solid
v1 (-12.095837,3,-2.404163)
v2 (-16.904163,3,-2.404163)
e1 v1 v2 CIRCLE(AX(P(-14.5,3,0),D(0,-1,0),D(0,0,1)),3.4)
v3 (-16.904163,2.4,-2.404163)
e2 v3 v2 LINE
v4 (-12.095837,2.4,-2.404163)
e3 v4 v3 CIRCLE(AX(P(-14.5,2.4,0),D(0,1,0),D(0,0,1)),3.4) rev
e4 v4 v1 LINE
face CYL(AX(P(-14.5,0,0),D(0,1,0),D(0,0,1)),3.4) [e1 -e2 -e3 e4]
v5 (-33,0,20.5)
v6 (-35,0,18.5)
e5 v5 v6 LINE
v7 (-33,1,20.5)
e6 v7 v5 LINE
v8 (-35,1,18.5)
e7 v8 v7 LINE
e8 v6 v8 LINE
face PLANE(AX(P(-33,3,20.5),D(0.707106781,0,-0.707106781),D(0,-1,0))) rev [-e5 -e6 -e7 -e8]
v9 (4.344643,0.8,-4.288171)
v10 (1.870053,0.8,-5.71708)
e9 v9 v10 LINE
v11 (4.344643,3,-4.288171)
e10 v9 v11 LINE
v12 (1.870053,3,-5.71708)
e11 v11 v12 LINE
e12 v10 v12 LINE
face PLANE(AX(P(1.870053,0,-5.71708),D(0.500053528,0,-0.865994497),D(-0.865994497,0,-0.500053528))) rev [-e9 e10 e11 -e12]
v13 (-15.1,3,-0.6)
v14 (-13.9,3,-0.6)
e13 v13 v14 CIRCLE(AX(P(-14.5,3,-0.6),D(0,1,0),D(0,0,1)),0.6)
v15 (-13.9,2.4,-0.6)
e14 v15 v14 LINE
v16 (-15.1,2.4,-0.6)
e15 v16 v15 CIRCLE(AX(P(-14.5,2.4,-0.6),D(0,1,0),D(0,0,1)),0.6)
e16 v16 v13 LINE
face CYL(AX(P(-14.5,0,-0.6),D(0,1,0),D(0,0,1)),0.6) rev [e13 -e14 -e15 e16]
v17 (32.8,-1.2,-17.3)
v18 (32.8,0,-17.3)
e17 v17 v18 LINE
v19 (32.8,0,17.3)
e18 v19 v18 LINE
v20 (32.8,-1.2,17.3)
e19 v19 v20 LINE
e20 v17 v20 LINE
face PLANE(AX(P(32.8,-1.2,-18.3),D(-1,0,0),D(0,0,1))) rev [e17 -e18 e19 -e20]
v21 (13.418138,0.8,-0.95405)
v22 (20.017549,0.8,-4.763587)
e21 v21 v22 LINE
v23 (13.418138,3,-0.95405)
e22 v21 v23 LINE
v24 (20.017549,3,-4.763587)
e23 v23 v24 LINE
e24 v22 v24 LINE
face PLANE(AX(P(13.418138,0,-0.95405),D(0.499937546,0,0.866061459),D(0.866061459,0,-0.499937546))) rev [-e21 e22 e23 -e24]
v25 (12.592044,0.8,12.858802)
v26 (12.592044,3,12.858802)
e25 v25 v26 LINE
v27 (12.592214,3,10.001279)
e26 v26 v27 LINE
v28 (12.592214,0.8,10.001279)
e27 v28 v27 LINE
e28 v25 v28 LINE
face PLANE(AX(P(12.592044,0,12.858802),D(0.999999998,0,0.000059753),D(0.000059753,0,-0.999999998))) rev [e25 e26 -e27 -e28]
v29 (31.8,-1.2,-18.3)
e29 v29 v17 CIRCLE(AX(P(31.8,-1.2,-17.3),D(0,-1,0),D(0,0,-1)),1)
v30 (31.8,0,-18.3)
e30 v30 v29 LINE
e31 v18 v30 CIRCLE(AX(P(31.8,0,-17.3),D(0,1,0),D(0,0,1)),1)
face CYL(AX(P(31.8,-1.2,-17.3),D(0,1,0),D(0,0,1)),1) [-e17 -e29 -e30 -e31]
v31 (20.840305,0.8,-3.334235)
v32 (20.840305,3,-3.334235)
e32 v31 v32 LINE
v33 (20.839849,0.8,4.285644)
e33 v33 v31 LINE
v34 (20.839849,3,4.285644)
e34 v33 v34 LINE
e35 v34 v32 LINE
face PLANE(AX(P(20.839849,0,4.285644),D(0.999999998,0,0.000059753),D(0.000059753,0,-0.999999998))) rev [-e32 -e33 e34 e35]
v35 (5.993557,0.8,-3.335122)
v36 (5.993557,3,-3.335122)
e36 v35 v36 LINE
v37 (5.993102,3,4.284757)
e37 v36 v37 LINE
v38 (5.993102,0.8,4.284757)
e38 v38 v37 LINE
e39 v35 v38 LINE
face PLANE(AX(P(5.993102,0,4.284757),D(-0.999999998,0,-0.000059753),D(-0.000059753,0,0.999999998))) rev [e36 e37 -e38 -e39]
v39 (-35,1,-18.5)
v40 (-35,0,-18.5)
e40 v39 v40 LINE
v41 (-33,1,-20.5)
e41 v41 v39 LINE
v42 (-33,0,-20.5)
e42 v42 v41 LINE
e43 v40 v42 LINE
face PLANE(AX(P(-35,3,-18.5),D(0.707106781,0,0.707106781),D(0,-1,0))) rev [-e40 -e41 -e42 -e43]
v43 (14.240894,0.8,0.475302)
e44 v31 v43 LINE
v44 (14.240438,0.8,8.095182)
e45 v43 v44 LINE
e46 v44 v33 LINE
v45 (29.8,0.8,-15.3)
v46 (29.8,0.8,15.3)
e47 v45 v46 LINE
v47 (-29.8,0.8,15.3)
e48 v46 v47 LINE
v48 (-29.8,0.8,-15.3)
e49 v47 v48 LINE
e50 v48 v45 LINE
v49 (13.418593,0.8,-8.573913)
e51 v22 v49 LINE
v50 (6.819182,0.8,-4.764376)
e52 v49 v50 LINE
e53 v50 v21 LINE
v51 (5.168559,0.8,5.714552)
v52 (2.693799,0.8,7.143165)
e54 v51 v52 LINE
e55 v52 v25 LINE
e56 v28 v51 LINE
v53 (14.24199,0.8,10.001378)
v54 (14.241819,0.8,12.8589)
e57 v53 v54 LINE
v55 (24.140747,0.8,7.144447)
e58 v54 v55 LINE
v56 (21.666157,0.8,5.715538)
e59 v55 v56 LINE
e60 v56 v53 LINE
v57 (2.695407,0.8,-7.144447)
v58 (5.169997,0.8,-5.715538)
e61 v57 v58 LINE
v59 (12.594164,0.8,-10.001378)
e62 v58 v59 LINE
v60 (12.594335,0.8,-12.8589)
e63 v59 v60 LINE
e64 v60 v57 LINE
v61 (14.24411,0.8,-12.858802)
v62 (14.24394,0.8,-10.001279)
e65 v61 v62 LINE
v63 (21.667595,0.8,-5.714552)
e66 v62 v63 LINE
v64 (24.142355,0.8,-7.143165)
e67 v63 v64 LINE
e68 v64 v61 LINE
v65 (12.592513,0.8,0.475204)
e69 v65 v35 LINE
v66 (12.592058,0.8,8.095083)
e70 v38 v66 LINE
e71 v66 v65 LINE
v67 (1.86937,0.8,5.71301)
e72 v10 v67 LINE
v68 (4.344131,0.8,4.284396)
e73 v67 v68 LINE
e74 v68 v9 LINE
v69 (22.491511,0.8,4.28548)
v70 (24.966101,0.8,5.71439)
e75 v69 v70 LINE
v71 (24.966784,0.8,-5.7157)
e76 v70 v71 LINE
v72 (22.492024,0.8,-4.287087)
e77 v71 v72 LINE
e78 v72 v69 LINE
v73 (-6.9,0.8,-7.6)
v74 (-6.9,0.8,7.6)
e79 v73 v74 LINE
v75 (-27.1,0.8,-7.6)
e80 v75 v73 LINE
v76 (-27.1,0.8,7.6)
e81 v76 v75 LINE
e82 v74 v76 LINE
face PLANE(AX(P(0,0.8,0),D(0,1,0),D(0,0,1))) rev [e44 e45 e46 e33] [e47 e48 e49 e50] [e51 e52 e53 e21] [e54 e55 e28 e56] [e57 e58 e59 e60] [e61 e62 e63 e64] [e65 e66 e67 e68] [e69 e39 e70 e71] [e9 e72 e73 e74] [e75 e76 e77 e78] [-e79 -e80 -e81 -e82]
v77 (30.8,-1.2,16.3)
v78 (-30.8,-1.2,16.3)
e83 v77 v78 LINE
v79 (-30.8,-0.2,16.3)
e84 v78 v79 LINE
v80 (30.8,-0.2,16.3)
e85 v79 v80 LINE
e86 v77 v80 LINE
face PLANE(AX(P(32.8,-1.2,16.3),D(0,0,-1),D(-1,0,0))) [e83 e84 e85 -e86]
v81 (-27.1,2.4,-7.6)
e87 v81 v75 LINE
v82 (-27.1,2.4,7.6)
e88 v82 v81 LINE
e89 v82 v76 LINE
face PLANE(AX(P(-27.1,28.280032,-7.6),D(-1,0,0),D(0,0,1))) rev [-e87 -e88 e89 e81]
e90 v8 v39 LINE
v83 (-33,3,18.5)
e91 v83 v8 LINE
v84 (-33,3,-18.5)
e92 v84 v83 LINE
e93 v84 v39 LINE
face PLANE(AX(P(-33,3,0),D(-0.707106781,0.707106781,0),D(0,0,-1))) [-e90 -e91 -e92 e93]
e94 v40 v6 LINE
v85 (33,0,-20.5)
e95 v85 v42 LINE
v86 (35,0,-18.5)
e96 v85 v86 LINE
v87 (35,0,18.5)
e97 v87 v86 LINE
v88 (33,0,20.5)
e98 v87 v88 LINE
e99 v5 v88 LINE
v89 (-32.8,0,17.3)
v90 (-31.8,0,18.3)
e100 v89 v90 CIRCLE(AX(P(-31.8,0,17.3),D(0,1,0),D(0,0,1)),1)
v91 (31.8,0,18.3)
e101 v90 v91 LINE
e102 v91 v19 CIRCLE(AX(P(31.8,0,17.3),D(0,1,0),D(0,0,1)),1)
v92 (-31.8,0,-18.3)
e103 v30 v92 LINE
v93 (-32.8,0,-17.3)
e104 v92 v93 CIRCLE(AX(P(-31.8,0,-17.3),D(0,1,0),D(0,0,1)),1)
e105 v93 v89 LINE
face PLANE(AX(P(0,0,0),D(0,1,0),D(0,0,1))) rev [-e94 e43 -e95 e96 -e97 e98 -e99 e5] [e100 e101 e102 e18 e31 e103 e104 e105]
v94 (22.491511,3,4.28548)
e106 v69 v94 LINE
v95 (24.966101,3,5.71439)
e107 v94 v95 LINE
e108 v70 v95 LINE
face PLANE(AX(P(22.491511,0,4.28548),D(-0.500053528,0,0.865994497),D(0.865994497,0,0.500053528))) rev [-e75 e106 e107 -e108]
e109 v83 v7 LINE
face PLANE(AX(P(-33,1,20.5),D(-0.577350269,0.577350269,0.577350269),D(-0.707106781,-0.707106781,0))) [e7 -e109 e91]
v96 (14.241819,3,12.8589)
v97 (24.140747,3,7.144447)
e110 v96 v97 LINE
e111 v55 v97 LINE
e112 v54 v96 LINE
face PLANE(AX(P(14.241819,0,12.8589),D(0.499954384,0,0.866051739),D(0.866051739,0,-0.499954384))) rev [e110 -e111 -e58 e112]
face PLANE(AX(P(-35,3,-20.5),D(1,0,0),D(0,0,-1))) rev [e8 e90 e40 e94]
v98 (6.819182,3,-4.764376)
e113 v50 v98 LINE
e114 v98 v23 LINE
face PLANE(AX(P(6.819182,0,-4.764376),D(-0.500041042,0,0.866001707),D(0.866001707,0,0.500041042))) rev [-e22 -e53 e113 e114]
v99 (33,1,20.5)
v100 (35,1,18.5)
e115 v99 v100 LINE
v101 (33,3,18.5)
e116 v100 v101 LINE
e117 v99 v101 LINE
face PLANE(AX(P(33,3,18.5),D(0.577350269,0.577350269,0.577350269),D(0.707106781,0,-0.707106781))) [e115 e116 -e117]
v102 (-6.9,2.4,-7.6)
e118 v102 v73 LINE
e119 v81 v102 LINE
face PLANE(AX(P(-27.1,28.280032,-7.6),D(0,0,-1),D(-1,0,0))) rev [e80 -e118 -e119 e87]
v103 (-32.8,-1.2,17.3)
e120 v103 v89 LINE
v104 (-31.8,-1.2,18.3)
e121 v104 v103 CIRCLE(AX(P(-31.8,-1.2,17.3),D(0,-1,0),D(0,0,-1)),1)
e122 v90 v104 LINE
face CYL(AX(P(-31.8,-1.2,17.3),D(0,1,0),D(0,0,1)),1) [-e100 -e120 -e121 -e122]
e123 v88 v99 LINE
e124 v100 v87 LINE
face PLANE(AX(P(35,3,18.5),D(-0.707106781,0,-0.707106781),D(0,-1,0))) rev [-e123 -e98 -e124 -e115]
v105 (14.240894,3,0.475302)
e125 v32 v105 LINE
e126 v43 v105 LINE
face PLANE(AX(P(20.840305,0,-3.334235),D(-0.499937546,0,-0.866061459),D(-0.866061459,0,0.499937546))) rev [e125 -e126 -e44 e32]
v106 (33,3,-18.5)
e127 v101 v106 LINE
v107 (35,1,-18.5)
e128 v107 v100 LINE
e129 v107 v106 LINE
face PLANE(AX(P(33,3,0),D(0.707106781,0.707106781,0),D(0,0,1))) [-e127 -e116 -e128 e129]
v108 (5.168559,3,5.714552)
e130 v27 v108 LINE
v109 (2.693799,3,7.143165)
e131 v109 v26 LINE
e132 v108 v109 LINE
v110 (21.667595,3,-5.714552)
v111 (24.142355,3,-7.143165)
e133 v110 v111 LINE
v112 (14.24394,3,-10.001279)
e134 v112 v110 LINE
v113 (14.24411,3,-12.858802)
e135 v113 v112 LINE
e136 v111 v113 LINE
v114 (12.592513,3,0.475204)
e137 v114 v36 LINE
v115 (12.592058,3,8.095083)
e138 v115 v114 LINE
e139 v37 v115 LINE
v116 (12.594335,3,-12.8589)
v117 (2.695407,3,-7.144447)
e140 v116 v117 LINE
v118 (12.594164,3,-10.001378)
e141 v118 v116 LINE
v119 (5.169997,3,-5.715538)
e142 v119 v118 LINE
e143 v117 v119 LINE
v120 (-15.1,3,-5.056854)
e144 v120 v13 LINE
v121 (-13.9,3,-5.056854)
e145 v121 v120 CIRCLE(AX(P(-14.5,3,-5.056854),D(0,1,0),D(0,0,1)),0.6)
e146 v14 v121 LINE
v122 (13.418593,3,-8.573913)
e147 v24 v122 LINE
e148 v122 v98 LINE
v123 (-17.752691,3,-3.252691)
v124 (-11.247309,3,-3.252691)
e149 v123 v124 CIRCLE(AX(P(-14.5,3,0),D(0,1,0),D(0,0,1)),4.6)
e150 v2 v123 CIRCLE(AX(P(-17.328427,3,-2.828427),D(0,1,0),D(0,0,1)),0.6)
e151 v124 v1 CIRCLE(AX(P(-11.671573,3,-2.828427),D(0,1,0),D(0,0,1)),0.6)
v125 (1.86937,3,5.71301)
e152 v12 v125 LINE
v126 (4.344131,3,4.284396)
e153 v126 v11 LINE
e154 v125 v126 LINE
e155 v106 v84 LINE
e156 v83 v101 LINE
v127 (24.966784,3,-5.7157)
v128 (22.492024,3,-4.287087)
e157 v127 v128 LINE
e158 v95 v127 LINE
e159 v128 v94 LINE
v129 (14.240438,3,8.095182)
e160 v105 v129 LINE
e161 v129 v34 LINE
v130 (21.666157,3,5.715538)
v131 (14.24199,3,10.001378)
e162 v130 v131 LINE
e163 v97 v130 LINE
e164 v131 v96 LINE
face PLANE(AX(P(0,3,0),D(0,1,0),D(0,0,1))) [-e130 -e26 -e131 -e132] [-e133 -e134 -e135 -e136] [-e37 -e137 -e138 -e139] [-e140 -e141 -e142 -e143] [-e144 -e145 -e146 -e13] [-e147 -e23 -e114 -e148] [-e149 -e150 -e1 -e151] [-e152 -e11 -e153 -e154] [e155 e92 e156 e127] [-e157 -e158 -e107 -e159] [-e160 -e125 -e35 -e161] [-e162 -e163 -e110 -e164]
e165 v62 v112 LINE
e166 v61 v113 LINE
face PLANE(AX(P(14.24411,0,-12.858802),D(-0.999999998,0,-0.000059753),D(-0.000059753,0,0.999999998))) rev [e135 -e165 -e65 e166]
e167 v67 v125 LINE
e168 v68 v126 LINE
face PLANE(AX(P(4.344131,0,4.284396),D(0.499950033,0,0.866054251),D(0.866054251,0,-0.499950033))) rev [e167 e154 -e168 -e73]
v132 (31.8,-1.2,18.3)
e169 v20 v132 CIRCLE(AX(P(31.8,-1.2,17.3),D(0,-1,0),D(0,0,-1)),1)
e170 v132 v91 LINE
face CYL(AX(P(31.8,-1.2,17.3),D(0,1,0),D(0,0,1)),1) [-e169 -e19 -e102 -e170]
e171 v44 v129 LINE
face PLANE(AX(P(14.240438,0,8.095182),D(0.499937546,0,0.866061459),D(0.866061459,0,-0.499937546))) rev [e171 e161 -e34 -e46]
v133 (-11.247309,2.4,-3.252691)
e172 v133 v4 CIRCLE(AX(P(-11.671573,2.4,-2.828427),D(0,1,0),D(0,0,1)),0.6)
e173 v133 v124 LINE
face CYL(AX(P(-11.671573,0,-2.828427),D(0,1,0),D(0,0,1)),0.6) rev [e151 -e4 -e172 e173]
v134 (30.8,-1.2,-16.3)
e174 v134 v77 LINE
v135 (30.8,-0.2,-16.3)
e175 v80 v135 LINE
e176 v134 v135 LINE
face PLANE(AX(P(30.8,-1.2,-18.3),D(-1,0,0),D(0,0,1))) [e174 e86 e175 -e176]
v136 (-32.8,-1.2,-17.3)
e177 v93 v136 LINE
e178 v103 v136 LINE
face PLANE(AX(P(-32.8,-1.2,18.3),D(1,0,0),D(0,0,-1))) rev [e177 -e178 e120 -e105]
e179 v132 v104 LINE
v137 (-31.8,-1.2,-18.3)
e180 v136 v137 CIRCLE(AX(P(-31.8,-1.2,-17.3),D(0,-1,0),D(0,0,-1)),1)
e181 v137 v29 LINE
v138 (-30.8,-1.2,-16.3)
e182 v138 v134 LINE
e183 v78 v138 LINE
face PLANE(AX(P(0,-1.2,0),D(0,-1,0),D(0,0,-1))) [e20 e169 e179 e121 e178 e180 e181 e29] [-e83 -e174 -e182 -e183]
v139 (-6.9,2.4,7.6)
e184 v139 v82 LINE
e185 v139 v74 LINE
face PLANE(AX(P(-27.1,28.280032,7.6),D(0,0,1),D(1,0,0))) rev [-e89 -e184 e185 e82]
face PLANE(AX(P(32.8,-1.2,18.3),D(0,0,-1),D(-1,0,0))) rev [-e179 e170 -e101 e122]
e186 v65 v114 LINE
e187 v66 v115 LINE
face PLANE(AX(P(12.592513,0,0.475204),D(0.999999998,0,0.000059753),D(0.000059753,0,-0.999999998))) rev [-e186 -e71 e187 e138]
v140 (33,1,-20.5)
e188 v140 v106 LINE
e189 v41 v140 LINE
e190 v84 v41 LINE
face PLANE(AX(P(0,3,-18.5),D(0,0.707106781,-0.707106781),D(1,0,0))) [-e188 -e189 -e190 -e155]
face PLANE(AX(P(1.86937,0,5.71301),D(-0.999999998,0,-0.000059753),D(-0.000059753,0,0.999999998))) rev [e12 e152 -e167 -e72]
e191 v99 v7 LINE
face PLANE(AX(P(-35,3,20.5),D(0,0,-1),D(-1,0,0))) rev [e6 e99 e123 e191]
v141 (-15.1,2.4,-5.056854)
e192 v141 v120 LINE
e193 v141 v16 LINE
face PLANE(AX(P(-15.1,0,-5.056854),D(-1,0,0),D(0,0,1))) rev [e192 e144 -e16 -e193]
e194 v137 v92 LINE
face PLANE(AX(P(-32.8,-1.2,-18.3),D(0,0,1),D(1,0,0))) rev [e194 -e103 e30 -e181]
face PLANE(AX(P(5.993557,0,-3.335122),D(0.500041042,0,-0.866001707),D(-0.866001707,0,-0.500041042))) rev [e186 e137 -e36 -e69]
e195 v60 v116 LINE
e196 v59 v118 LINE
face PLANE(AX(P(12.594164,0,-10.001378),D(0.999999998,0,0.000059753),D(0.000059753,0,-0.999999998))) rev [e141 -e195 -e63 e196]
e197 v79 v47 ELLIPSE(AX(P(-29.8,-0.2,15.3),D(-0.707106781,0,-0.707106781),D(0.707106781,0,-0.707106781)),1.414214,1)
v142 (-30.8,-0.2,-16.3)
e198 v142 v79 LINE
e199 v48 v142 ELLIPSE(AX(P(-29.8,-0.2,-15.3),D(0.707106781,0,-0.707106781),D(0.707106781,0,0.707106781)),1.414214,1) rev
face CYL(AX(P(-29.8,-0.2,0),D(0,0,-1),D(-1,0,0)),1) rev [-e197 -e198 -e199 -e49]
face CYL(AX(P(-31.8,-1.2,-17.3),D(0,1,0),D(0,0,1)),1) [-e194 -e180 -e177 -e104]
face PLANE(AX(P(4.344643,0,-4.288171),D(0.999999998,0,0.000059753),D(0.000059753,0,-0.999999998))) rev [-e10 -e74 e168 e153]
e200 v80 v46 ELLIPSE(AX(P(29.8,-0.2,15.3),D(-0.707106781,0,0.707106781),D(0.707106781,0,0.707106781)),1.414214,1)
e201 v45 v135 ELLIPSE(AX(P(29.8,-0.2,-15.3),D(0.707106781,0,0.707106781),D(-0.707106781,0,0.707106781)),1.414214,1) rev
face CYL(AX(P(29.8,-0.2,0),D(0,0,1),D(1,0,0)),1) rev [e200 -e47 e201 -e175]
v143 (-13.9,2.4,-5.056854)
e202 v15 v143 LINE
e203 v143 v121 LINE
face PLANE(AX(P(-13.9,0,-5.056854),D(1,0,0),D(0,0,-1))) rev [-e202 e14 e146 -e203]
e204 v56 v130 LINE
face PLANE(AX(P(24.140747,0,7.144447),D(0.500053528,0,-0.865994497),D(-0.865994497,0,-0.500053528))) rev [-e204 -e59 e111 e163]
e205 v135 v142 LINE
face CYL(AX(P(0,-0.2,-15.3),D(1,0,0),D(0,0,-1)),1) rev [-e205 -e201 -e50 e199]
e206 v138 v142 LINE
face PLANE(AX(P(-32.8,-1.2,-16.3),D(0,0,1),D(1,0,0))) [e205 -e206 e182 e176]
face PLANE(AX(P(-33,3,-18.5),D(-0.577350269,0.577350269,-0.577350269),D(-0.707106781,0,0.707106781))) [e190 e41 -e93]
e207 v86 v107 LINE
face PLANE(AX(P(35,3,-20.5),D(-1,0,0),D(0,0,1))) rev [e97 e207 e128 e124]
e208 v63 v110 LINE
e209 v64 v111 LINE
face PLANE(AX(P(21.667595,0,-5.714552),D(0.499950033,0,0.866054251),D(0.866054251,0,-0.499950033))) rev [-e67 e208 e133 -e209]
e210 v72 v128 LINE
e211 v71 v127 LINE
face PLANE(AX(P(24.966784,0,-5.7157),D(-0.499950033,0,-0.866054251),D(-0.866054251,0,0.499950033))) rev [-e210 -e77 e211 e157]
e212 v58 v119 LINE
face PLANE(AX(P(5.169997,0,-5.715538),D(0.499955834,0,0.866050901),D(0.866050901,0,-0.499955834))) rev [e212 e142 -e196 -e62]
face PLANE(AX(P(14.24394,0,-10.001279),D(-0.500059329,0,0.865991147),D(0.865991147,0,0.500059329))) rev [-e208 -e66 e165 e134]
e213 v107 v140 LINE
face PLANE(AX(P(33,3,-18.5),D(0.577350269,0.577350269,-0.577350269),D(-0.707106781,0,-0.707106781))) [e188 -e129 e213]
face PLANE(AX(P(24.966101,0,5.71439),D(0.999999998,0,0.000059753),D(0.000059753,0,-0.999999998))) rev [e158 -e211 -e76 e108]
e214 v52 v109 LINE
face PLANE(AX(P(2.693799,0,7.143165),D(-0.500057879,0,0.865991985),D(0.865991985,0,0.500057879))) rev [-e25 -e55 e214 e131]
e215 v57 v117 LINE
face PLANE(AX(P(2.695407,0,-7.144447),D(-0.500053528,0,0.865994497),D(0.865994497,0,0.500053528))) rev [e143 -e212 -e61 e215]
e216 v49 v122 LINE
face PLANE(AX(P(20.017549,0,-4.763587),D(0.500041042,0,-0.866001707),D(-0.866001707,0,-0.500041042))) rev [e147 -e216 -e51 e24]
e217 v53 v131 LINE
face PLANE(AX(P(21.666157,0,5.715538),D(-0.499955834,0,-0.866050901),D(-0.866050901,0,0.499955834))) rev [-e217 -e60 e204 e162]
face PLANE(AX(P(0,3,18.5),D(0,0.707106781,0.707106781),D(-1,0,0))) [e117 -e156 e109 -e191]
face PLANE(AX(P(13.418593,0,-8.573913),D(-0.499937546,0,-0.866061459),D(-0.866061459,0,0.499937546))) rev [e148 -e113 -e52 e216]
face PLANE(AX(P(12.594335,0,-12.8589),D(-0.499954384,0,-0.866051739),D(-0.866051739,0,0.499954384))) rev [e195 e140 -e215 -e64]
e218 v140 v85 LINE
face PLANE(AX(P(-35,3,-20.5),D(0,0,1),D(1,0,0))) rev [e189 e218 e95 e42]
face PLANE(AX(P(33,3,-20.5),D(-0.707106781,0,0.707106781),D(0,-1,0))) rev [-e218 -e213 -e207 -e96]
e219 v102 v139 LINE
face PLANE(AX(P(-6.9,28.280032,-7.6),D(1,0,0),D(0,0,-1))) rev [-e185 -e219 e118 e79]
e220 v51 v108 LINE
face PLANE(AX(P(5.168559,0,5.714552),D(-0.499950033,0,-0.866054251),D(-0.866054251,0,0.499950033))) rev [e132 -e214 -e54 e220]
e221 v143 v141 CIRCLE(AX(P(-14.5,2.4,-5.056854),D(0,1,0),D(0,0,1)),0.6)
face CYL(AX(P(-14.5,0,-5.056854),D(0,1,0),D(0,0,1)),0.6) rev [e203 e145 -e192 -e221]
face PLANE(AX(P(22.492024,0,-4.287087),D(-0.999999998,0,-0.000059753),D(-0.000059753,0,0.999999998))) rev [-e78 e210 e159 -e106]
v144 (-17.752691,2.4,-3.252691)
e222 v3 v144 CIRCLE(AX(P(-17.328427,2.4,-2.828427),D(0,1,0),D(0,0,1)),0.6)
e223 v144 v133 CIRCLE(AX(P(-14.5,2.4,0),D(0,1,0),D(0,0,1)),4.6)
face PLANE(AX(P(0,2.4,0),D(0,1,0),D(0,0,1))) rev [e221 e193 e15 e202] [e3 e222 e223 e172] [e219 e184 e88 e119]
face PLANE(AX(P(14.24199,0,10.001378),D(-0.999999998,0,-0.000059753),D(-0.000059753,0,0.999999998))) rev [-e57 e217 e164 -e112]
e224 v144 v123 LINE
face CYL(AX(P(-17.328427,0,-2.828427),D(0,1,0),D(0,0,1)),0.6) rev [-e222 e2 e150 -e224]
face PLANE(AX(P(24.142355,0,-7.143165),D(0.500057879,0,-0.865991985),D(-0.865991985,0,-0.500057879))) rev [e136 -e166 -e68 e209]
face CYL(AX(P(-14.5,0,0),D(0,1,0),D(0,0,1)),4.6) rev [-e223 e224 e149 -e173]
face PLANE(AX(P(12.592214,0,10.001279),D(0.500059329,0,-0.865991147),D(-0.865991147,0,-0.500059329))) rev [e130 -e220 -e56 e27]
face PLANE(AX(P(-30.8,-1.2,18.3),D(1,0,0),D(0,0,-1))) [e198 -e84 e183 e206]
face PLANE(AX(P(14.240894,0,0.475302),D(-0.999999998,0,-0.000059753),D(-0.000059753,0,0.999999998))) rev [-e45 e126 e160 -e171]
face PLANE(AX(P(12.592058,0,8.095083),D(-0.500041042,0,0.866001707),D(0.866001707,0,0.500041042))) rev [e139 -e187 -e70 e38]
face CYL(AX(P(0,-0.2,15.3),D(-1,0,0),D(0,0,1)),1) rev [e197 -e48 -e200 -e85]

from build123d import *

# Parameters (mm, degrees)
ESQUISSE1_W             = 70
ESQUISSE1_H             = 41
BOSS_EXTRU_1_DEPTH      = 3
COQUE1_T                = -2.2
CHANFREIN1_SIZE         = 2
ESQUISSE3_W             = 20.2
ESQUISSE3_H             = 15.2
ENL_V_MAT_EXTRU_2_DEPTH = 1.6
ENL_V_MAT_EXTRU_5_DEPTH = 41.672472263
ENL_V_START             = -2.2
ENL_V_MAT_EXTRU_4_DEPTH = 2.2
ESQUISSE7_W             = 65.6
ESQUISSE7_H             = 36.6
ESQUISSE7_W_2           = 61.6
ESQUISSE7_H_2           = 32.6
EXTRU_MINCE1_DEPTH      = 2
CONG_1_R                = 1


# Read off the part's stored shape, not the designer's step: Enlèv. mat.-Extru.4
with BuildPart() as part:
    # Esquisse1 → Boss.-Extru.1 (new body)
    with BuildSketch(Plane(origin=(0, 0, 0), x_dir=(1, 0, 0), z_dir=(0, 1, 0))):
        Rectangle(ESQUISSE1_W, ESQUISSE1_H)
    extrude(amount=BOSS_EXTRU_1_DEPTH)

    # Coque1
    coque1_openings = [part.faces().sort_by_distance(p)[0] for p in [
        (0, 0, 0),
    ]]
    offset(amount=COQUE1_T, openings=coque1_openings, kind=Kind.INTERSECTION)

    # Chanfrein1
    chanfrein1_edges = [part.edges().sort_by_distance(p)[0] for p in [
        (-35, 3, 0),
        (0, 3, 20.5),
        (35, 3, 0),
        (35, 1.5, 20.5),
        (-35, 1.5, 20.5),
        (-35, 1.5, -20.5),
        (35, 1.5, -20.5),
        (0, 3, -20.5),
    ]]
    chamfer(chanfrein1_edges, length=CHANFREIN1_SIZE)

    # Esquisse3 → Enlèv. mat.-Extru.2 (cut)
    with BuildSketch(Plane.XZ.offset(-0.8)):
        with Locations((-17, 0)):
            Rectangle(ESQUISSE3_W, ESQUISSE3_H)
    extrude(amount=-ENL_V_MAT_EXTRU_2_DEPTH, mode=Mode.SUBTRACT)

    # Esquisse8 → Enlèv. mat.-Extru.5 (cut, through all)
    with BuildSketch(Plane(origin=(0, 3, 0), x_dir=(1, 0, 0), z_dir=(0, 1, 0))):
        with BuildLine():
            Line((-13.9, 5.056854249), (-13.9, 0.6))
            ThreePointArc((-13.9, 0.6), (-14.5, 0), (-15.1, 0.6))
            Line((-15.1, 0.6), (-15.1, 5.056854249))
            ThreePointArc((-15.1, 5.056854249), (-14.5, 5.656854249), (-13.9, 5.056854249))
        make_face()
        with BuildLine():
            ThreePointArc((-17.752691193, 3.252691193), (-14.5, -4.6), (-11.247308807, 3.252691193))
            ThreePointArc((-11.247308807, 3.252691193), (-12.095836944, 3.252691193), (-12.095836944, 2.404163056))
            ThreePointArc((-12.095836944, 2.404163056), (-14.5, -3.4), (-16.904163056, 2.404163056))
            ThreePointArc((-16.904163056, 2.404163056), (-16.904163056, 3.252691193), (-17.752691193, 3.252691193))
        make_face()
    extrude(amount=-ENL_V_MAT_EXTRU_5_DEPTH, mode=Mode.SUBTRACT)

    # Enlèv. mat.-Extru.4 outline → Enlèv. mat.-Extru.4 (cut)
    with BuildSketch(Plane(origin=(0, 3, 0), x_dir=(1, 0, 0), z_dir=(0, 1, 0)).offset(ENL_V_START)):
        Polygon((21.667594623, 5.714552033), (24.142355296, 7.1431654), (14.244110438, 12.858801818), (14.243939692, 10.001279345), align=None)
        Polygon((12.5925129, -0.475203574), (5.9935572, 3.335122269), (5.993101889, -4.284757181), (12.592057589, -8.095083023), align=None)
        Polygon((4.344642768, 4.288171287), (1.870052841, 5.717080393), (1.869369857, -5.7130095), (4.34413053, -4.284396133), align=None)
        Polygon((12.594164363, 10.001377924), (12.594335108, 12.858900397), (2.695407267, 7.144446922), (5.169997194, 5.715537816), align=None)
        Polygon((5.168559477, -5.714552033), (2.693798804, -7.1431654), (12.592043662, -12.858801818), (12.592214408, -10.001279345), align=None)
        Polygon((14.240438301, -8.095181519), (20.839849312, -4.28564432), (20.840304623, 3.33423513), (14.240893612, -0.47530207), align=None)
        Polygon((13.418138159, 0.954049774), (20.01754917, 4.763586973), (13.41859347, 8.573912816), (6.819182459, 4.764375617), align=None)
        Polygon((22.491511493, -4.285480495), (24.96610142, -5.714389602), (24.966784403, 5.715700292), (22.49202373, 4.287086925), align=None)
        Polygon((14.241989737, -10.001377924), (14.241818992, -12.858900397), (24.140746833, -7.144446922), (21.666156906, -5.715537816), align=None)
    extrude(amount=ENL_V_MAT_EXTRU_4_DEPTH, mode=Mode.SUBTRACT)

    # Esquisse7 → Extru.-Mince1 (add)
    with BuildSketch(Plane.XZ.offset(-0.8)):
        Rectangle(ESQUISSE7_W, ESQUISSE7_H)
        Rectangle(ESQUISSE7_W_2, ESQUISSE7_H_2, mode=Mode.SUBTRACT)
    extrude(amount=EXTRU_MINCE1_DEPTH)

    # Congé1
    cong_1_edges = [part.edges().sort_by_distance(p)[0] for p in [
        (-32.8, -0.6, -18.3),
        (32.8, -0.6, -18.3),
        (32.8, -0.6, 18.3),
        (-32.8, -0.6, 18.3),
        (0, 0.8, -16.3),
        (30.8, 0.8, 0),
        (0, 0.8, 16.3),
        (-30.8, 0.8, 0),
    ]]
    fillet(cong_1_edges, radius=CONG_1_R)


solid = part.part
